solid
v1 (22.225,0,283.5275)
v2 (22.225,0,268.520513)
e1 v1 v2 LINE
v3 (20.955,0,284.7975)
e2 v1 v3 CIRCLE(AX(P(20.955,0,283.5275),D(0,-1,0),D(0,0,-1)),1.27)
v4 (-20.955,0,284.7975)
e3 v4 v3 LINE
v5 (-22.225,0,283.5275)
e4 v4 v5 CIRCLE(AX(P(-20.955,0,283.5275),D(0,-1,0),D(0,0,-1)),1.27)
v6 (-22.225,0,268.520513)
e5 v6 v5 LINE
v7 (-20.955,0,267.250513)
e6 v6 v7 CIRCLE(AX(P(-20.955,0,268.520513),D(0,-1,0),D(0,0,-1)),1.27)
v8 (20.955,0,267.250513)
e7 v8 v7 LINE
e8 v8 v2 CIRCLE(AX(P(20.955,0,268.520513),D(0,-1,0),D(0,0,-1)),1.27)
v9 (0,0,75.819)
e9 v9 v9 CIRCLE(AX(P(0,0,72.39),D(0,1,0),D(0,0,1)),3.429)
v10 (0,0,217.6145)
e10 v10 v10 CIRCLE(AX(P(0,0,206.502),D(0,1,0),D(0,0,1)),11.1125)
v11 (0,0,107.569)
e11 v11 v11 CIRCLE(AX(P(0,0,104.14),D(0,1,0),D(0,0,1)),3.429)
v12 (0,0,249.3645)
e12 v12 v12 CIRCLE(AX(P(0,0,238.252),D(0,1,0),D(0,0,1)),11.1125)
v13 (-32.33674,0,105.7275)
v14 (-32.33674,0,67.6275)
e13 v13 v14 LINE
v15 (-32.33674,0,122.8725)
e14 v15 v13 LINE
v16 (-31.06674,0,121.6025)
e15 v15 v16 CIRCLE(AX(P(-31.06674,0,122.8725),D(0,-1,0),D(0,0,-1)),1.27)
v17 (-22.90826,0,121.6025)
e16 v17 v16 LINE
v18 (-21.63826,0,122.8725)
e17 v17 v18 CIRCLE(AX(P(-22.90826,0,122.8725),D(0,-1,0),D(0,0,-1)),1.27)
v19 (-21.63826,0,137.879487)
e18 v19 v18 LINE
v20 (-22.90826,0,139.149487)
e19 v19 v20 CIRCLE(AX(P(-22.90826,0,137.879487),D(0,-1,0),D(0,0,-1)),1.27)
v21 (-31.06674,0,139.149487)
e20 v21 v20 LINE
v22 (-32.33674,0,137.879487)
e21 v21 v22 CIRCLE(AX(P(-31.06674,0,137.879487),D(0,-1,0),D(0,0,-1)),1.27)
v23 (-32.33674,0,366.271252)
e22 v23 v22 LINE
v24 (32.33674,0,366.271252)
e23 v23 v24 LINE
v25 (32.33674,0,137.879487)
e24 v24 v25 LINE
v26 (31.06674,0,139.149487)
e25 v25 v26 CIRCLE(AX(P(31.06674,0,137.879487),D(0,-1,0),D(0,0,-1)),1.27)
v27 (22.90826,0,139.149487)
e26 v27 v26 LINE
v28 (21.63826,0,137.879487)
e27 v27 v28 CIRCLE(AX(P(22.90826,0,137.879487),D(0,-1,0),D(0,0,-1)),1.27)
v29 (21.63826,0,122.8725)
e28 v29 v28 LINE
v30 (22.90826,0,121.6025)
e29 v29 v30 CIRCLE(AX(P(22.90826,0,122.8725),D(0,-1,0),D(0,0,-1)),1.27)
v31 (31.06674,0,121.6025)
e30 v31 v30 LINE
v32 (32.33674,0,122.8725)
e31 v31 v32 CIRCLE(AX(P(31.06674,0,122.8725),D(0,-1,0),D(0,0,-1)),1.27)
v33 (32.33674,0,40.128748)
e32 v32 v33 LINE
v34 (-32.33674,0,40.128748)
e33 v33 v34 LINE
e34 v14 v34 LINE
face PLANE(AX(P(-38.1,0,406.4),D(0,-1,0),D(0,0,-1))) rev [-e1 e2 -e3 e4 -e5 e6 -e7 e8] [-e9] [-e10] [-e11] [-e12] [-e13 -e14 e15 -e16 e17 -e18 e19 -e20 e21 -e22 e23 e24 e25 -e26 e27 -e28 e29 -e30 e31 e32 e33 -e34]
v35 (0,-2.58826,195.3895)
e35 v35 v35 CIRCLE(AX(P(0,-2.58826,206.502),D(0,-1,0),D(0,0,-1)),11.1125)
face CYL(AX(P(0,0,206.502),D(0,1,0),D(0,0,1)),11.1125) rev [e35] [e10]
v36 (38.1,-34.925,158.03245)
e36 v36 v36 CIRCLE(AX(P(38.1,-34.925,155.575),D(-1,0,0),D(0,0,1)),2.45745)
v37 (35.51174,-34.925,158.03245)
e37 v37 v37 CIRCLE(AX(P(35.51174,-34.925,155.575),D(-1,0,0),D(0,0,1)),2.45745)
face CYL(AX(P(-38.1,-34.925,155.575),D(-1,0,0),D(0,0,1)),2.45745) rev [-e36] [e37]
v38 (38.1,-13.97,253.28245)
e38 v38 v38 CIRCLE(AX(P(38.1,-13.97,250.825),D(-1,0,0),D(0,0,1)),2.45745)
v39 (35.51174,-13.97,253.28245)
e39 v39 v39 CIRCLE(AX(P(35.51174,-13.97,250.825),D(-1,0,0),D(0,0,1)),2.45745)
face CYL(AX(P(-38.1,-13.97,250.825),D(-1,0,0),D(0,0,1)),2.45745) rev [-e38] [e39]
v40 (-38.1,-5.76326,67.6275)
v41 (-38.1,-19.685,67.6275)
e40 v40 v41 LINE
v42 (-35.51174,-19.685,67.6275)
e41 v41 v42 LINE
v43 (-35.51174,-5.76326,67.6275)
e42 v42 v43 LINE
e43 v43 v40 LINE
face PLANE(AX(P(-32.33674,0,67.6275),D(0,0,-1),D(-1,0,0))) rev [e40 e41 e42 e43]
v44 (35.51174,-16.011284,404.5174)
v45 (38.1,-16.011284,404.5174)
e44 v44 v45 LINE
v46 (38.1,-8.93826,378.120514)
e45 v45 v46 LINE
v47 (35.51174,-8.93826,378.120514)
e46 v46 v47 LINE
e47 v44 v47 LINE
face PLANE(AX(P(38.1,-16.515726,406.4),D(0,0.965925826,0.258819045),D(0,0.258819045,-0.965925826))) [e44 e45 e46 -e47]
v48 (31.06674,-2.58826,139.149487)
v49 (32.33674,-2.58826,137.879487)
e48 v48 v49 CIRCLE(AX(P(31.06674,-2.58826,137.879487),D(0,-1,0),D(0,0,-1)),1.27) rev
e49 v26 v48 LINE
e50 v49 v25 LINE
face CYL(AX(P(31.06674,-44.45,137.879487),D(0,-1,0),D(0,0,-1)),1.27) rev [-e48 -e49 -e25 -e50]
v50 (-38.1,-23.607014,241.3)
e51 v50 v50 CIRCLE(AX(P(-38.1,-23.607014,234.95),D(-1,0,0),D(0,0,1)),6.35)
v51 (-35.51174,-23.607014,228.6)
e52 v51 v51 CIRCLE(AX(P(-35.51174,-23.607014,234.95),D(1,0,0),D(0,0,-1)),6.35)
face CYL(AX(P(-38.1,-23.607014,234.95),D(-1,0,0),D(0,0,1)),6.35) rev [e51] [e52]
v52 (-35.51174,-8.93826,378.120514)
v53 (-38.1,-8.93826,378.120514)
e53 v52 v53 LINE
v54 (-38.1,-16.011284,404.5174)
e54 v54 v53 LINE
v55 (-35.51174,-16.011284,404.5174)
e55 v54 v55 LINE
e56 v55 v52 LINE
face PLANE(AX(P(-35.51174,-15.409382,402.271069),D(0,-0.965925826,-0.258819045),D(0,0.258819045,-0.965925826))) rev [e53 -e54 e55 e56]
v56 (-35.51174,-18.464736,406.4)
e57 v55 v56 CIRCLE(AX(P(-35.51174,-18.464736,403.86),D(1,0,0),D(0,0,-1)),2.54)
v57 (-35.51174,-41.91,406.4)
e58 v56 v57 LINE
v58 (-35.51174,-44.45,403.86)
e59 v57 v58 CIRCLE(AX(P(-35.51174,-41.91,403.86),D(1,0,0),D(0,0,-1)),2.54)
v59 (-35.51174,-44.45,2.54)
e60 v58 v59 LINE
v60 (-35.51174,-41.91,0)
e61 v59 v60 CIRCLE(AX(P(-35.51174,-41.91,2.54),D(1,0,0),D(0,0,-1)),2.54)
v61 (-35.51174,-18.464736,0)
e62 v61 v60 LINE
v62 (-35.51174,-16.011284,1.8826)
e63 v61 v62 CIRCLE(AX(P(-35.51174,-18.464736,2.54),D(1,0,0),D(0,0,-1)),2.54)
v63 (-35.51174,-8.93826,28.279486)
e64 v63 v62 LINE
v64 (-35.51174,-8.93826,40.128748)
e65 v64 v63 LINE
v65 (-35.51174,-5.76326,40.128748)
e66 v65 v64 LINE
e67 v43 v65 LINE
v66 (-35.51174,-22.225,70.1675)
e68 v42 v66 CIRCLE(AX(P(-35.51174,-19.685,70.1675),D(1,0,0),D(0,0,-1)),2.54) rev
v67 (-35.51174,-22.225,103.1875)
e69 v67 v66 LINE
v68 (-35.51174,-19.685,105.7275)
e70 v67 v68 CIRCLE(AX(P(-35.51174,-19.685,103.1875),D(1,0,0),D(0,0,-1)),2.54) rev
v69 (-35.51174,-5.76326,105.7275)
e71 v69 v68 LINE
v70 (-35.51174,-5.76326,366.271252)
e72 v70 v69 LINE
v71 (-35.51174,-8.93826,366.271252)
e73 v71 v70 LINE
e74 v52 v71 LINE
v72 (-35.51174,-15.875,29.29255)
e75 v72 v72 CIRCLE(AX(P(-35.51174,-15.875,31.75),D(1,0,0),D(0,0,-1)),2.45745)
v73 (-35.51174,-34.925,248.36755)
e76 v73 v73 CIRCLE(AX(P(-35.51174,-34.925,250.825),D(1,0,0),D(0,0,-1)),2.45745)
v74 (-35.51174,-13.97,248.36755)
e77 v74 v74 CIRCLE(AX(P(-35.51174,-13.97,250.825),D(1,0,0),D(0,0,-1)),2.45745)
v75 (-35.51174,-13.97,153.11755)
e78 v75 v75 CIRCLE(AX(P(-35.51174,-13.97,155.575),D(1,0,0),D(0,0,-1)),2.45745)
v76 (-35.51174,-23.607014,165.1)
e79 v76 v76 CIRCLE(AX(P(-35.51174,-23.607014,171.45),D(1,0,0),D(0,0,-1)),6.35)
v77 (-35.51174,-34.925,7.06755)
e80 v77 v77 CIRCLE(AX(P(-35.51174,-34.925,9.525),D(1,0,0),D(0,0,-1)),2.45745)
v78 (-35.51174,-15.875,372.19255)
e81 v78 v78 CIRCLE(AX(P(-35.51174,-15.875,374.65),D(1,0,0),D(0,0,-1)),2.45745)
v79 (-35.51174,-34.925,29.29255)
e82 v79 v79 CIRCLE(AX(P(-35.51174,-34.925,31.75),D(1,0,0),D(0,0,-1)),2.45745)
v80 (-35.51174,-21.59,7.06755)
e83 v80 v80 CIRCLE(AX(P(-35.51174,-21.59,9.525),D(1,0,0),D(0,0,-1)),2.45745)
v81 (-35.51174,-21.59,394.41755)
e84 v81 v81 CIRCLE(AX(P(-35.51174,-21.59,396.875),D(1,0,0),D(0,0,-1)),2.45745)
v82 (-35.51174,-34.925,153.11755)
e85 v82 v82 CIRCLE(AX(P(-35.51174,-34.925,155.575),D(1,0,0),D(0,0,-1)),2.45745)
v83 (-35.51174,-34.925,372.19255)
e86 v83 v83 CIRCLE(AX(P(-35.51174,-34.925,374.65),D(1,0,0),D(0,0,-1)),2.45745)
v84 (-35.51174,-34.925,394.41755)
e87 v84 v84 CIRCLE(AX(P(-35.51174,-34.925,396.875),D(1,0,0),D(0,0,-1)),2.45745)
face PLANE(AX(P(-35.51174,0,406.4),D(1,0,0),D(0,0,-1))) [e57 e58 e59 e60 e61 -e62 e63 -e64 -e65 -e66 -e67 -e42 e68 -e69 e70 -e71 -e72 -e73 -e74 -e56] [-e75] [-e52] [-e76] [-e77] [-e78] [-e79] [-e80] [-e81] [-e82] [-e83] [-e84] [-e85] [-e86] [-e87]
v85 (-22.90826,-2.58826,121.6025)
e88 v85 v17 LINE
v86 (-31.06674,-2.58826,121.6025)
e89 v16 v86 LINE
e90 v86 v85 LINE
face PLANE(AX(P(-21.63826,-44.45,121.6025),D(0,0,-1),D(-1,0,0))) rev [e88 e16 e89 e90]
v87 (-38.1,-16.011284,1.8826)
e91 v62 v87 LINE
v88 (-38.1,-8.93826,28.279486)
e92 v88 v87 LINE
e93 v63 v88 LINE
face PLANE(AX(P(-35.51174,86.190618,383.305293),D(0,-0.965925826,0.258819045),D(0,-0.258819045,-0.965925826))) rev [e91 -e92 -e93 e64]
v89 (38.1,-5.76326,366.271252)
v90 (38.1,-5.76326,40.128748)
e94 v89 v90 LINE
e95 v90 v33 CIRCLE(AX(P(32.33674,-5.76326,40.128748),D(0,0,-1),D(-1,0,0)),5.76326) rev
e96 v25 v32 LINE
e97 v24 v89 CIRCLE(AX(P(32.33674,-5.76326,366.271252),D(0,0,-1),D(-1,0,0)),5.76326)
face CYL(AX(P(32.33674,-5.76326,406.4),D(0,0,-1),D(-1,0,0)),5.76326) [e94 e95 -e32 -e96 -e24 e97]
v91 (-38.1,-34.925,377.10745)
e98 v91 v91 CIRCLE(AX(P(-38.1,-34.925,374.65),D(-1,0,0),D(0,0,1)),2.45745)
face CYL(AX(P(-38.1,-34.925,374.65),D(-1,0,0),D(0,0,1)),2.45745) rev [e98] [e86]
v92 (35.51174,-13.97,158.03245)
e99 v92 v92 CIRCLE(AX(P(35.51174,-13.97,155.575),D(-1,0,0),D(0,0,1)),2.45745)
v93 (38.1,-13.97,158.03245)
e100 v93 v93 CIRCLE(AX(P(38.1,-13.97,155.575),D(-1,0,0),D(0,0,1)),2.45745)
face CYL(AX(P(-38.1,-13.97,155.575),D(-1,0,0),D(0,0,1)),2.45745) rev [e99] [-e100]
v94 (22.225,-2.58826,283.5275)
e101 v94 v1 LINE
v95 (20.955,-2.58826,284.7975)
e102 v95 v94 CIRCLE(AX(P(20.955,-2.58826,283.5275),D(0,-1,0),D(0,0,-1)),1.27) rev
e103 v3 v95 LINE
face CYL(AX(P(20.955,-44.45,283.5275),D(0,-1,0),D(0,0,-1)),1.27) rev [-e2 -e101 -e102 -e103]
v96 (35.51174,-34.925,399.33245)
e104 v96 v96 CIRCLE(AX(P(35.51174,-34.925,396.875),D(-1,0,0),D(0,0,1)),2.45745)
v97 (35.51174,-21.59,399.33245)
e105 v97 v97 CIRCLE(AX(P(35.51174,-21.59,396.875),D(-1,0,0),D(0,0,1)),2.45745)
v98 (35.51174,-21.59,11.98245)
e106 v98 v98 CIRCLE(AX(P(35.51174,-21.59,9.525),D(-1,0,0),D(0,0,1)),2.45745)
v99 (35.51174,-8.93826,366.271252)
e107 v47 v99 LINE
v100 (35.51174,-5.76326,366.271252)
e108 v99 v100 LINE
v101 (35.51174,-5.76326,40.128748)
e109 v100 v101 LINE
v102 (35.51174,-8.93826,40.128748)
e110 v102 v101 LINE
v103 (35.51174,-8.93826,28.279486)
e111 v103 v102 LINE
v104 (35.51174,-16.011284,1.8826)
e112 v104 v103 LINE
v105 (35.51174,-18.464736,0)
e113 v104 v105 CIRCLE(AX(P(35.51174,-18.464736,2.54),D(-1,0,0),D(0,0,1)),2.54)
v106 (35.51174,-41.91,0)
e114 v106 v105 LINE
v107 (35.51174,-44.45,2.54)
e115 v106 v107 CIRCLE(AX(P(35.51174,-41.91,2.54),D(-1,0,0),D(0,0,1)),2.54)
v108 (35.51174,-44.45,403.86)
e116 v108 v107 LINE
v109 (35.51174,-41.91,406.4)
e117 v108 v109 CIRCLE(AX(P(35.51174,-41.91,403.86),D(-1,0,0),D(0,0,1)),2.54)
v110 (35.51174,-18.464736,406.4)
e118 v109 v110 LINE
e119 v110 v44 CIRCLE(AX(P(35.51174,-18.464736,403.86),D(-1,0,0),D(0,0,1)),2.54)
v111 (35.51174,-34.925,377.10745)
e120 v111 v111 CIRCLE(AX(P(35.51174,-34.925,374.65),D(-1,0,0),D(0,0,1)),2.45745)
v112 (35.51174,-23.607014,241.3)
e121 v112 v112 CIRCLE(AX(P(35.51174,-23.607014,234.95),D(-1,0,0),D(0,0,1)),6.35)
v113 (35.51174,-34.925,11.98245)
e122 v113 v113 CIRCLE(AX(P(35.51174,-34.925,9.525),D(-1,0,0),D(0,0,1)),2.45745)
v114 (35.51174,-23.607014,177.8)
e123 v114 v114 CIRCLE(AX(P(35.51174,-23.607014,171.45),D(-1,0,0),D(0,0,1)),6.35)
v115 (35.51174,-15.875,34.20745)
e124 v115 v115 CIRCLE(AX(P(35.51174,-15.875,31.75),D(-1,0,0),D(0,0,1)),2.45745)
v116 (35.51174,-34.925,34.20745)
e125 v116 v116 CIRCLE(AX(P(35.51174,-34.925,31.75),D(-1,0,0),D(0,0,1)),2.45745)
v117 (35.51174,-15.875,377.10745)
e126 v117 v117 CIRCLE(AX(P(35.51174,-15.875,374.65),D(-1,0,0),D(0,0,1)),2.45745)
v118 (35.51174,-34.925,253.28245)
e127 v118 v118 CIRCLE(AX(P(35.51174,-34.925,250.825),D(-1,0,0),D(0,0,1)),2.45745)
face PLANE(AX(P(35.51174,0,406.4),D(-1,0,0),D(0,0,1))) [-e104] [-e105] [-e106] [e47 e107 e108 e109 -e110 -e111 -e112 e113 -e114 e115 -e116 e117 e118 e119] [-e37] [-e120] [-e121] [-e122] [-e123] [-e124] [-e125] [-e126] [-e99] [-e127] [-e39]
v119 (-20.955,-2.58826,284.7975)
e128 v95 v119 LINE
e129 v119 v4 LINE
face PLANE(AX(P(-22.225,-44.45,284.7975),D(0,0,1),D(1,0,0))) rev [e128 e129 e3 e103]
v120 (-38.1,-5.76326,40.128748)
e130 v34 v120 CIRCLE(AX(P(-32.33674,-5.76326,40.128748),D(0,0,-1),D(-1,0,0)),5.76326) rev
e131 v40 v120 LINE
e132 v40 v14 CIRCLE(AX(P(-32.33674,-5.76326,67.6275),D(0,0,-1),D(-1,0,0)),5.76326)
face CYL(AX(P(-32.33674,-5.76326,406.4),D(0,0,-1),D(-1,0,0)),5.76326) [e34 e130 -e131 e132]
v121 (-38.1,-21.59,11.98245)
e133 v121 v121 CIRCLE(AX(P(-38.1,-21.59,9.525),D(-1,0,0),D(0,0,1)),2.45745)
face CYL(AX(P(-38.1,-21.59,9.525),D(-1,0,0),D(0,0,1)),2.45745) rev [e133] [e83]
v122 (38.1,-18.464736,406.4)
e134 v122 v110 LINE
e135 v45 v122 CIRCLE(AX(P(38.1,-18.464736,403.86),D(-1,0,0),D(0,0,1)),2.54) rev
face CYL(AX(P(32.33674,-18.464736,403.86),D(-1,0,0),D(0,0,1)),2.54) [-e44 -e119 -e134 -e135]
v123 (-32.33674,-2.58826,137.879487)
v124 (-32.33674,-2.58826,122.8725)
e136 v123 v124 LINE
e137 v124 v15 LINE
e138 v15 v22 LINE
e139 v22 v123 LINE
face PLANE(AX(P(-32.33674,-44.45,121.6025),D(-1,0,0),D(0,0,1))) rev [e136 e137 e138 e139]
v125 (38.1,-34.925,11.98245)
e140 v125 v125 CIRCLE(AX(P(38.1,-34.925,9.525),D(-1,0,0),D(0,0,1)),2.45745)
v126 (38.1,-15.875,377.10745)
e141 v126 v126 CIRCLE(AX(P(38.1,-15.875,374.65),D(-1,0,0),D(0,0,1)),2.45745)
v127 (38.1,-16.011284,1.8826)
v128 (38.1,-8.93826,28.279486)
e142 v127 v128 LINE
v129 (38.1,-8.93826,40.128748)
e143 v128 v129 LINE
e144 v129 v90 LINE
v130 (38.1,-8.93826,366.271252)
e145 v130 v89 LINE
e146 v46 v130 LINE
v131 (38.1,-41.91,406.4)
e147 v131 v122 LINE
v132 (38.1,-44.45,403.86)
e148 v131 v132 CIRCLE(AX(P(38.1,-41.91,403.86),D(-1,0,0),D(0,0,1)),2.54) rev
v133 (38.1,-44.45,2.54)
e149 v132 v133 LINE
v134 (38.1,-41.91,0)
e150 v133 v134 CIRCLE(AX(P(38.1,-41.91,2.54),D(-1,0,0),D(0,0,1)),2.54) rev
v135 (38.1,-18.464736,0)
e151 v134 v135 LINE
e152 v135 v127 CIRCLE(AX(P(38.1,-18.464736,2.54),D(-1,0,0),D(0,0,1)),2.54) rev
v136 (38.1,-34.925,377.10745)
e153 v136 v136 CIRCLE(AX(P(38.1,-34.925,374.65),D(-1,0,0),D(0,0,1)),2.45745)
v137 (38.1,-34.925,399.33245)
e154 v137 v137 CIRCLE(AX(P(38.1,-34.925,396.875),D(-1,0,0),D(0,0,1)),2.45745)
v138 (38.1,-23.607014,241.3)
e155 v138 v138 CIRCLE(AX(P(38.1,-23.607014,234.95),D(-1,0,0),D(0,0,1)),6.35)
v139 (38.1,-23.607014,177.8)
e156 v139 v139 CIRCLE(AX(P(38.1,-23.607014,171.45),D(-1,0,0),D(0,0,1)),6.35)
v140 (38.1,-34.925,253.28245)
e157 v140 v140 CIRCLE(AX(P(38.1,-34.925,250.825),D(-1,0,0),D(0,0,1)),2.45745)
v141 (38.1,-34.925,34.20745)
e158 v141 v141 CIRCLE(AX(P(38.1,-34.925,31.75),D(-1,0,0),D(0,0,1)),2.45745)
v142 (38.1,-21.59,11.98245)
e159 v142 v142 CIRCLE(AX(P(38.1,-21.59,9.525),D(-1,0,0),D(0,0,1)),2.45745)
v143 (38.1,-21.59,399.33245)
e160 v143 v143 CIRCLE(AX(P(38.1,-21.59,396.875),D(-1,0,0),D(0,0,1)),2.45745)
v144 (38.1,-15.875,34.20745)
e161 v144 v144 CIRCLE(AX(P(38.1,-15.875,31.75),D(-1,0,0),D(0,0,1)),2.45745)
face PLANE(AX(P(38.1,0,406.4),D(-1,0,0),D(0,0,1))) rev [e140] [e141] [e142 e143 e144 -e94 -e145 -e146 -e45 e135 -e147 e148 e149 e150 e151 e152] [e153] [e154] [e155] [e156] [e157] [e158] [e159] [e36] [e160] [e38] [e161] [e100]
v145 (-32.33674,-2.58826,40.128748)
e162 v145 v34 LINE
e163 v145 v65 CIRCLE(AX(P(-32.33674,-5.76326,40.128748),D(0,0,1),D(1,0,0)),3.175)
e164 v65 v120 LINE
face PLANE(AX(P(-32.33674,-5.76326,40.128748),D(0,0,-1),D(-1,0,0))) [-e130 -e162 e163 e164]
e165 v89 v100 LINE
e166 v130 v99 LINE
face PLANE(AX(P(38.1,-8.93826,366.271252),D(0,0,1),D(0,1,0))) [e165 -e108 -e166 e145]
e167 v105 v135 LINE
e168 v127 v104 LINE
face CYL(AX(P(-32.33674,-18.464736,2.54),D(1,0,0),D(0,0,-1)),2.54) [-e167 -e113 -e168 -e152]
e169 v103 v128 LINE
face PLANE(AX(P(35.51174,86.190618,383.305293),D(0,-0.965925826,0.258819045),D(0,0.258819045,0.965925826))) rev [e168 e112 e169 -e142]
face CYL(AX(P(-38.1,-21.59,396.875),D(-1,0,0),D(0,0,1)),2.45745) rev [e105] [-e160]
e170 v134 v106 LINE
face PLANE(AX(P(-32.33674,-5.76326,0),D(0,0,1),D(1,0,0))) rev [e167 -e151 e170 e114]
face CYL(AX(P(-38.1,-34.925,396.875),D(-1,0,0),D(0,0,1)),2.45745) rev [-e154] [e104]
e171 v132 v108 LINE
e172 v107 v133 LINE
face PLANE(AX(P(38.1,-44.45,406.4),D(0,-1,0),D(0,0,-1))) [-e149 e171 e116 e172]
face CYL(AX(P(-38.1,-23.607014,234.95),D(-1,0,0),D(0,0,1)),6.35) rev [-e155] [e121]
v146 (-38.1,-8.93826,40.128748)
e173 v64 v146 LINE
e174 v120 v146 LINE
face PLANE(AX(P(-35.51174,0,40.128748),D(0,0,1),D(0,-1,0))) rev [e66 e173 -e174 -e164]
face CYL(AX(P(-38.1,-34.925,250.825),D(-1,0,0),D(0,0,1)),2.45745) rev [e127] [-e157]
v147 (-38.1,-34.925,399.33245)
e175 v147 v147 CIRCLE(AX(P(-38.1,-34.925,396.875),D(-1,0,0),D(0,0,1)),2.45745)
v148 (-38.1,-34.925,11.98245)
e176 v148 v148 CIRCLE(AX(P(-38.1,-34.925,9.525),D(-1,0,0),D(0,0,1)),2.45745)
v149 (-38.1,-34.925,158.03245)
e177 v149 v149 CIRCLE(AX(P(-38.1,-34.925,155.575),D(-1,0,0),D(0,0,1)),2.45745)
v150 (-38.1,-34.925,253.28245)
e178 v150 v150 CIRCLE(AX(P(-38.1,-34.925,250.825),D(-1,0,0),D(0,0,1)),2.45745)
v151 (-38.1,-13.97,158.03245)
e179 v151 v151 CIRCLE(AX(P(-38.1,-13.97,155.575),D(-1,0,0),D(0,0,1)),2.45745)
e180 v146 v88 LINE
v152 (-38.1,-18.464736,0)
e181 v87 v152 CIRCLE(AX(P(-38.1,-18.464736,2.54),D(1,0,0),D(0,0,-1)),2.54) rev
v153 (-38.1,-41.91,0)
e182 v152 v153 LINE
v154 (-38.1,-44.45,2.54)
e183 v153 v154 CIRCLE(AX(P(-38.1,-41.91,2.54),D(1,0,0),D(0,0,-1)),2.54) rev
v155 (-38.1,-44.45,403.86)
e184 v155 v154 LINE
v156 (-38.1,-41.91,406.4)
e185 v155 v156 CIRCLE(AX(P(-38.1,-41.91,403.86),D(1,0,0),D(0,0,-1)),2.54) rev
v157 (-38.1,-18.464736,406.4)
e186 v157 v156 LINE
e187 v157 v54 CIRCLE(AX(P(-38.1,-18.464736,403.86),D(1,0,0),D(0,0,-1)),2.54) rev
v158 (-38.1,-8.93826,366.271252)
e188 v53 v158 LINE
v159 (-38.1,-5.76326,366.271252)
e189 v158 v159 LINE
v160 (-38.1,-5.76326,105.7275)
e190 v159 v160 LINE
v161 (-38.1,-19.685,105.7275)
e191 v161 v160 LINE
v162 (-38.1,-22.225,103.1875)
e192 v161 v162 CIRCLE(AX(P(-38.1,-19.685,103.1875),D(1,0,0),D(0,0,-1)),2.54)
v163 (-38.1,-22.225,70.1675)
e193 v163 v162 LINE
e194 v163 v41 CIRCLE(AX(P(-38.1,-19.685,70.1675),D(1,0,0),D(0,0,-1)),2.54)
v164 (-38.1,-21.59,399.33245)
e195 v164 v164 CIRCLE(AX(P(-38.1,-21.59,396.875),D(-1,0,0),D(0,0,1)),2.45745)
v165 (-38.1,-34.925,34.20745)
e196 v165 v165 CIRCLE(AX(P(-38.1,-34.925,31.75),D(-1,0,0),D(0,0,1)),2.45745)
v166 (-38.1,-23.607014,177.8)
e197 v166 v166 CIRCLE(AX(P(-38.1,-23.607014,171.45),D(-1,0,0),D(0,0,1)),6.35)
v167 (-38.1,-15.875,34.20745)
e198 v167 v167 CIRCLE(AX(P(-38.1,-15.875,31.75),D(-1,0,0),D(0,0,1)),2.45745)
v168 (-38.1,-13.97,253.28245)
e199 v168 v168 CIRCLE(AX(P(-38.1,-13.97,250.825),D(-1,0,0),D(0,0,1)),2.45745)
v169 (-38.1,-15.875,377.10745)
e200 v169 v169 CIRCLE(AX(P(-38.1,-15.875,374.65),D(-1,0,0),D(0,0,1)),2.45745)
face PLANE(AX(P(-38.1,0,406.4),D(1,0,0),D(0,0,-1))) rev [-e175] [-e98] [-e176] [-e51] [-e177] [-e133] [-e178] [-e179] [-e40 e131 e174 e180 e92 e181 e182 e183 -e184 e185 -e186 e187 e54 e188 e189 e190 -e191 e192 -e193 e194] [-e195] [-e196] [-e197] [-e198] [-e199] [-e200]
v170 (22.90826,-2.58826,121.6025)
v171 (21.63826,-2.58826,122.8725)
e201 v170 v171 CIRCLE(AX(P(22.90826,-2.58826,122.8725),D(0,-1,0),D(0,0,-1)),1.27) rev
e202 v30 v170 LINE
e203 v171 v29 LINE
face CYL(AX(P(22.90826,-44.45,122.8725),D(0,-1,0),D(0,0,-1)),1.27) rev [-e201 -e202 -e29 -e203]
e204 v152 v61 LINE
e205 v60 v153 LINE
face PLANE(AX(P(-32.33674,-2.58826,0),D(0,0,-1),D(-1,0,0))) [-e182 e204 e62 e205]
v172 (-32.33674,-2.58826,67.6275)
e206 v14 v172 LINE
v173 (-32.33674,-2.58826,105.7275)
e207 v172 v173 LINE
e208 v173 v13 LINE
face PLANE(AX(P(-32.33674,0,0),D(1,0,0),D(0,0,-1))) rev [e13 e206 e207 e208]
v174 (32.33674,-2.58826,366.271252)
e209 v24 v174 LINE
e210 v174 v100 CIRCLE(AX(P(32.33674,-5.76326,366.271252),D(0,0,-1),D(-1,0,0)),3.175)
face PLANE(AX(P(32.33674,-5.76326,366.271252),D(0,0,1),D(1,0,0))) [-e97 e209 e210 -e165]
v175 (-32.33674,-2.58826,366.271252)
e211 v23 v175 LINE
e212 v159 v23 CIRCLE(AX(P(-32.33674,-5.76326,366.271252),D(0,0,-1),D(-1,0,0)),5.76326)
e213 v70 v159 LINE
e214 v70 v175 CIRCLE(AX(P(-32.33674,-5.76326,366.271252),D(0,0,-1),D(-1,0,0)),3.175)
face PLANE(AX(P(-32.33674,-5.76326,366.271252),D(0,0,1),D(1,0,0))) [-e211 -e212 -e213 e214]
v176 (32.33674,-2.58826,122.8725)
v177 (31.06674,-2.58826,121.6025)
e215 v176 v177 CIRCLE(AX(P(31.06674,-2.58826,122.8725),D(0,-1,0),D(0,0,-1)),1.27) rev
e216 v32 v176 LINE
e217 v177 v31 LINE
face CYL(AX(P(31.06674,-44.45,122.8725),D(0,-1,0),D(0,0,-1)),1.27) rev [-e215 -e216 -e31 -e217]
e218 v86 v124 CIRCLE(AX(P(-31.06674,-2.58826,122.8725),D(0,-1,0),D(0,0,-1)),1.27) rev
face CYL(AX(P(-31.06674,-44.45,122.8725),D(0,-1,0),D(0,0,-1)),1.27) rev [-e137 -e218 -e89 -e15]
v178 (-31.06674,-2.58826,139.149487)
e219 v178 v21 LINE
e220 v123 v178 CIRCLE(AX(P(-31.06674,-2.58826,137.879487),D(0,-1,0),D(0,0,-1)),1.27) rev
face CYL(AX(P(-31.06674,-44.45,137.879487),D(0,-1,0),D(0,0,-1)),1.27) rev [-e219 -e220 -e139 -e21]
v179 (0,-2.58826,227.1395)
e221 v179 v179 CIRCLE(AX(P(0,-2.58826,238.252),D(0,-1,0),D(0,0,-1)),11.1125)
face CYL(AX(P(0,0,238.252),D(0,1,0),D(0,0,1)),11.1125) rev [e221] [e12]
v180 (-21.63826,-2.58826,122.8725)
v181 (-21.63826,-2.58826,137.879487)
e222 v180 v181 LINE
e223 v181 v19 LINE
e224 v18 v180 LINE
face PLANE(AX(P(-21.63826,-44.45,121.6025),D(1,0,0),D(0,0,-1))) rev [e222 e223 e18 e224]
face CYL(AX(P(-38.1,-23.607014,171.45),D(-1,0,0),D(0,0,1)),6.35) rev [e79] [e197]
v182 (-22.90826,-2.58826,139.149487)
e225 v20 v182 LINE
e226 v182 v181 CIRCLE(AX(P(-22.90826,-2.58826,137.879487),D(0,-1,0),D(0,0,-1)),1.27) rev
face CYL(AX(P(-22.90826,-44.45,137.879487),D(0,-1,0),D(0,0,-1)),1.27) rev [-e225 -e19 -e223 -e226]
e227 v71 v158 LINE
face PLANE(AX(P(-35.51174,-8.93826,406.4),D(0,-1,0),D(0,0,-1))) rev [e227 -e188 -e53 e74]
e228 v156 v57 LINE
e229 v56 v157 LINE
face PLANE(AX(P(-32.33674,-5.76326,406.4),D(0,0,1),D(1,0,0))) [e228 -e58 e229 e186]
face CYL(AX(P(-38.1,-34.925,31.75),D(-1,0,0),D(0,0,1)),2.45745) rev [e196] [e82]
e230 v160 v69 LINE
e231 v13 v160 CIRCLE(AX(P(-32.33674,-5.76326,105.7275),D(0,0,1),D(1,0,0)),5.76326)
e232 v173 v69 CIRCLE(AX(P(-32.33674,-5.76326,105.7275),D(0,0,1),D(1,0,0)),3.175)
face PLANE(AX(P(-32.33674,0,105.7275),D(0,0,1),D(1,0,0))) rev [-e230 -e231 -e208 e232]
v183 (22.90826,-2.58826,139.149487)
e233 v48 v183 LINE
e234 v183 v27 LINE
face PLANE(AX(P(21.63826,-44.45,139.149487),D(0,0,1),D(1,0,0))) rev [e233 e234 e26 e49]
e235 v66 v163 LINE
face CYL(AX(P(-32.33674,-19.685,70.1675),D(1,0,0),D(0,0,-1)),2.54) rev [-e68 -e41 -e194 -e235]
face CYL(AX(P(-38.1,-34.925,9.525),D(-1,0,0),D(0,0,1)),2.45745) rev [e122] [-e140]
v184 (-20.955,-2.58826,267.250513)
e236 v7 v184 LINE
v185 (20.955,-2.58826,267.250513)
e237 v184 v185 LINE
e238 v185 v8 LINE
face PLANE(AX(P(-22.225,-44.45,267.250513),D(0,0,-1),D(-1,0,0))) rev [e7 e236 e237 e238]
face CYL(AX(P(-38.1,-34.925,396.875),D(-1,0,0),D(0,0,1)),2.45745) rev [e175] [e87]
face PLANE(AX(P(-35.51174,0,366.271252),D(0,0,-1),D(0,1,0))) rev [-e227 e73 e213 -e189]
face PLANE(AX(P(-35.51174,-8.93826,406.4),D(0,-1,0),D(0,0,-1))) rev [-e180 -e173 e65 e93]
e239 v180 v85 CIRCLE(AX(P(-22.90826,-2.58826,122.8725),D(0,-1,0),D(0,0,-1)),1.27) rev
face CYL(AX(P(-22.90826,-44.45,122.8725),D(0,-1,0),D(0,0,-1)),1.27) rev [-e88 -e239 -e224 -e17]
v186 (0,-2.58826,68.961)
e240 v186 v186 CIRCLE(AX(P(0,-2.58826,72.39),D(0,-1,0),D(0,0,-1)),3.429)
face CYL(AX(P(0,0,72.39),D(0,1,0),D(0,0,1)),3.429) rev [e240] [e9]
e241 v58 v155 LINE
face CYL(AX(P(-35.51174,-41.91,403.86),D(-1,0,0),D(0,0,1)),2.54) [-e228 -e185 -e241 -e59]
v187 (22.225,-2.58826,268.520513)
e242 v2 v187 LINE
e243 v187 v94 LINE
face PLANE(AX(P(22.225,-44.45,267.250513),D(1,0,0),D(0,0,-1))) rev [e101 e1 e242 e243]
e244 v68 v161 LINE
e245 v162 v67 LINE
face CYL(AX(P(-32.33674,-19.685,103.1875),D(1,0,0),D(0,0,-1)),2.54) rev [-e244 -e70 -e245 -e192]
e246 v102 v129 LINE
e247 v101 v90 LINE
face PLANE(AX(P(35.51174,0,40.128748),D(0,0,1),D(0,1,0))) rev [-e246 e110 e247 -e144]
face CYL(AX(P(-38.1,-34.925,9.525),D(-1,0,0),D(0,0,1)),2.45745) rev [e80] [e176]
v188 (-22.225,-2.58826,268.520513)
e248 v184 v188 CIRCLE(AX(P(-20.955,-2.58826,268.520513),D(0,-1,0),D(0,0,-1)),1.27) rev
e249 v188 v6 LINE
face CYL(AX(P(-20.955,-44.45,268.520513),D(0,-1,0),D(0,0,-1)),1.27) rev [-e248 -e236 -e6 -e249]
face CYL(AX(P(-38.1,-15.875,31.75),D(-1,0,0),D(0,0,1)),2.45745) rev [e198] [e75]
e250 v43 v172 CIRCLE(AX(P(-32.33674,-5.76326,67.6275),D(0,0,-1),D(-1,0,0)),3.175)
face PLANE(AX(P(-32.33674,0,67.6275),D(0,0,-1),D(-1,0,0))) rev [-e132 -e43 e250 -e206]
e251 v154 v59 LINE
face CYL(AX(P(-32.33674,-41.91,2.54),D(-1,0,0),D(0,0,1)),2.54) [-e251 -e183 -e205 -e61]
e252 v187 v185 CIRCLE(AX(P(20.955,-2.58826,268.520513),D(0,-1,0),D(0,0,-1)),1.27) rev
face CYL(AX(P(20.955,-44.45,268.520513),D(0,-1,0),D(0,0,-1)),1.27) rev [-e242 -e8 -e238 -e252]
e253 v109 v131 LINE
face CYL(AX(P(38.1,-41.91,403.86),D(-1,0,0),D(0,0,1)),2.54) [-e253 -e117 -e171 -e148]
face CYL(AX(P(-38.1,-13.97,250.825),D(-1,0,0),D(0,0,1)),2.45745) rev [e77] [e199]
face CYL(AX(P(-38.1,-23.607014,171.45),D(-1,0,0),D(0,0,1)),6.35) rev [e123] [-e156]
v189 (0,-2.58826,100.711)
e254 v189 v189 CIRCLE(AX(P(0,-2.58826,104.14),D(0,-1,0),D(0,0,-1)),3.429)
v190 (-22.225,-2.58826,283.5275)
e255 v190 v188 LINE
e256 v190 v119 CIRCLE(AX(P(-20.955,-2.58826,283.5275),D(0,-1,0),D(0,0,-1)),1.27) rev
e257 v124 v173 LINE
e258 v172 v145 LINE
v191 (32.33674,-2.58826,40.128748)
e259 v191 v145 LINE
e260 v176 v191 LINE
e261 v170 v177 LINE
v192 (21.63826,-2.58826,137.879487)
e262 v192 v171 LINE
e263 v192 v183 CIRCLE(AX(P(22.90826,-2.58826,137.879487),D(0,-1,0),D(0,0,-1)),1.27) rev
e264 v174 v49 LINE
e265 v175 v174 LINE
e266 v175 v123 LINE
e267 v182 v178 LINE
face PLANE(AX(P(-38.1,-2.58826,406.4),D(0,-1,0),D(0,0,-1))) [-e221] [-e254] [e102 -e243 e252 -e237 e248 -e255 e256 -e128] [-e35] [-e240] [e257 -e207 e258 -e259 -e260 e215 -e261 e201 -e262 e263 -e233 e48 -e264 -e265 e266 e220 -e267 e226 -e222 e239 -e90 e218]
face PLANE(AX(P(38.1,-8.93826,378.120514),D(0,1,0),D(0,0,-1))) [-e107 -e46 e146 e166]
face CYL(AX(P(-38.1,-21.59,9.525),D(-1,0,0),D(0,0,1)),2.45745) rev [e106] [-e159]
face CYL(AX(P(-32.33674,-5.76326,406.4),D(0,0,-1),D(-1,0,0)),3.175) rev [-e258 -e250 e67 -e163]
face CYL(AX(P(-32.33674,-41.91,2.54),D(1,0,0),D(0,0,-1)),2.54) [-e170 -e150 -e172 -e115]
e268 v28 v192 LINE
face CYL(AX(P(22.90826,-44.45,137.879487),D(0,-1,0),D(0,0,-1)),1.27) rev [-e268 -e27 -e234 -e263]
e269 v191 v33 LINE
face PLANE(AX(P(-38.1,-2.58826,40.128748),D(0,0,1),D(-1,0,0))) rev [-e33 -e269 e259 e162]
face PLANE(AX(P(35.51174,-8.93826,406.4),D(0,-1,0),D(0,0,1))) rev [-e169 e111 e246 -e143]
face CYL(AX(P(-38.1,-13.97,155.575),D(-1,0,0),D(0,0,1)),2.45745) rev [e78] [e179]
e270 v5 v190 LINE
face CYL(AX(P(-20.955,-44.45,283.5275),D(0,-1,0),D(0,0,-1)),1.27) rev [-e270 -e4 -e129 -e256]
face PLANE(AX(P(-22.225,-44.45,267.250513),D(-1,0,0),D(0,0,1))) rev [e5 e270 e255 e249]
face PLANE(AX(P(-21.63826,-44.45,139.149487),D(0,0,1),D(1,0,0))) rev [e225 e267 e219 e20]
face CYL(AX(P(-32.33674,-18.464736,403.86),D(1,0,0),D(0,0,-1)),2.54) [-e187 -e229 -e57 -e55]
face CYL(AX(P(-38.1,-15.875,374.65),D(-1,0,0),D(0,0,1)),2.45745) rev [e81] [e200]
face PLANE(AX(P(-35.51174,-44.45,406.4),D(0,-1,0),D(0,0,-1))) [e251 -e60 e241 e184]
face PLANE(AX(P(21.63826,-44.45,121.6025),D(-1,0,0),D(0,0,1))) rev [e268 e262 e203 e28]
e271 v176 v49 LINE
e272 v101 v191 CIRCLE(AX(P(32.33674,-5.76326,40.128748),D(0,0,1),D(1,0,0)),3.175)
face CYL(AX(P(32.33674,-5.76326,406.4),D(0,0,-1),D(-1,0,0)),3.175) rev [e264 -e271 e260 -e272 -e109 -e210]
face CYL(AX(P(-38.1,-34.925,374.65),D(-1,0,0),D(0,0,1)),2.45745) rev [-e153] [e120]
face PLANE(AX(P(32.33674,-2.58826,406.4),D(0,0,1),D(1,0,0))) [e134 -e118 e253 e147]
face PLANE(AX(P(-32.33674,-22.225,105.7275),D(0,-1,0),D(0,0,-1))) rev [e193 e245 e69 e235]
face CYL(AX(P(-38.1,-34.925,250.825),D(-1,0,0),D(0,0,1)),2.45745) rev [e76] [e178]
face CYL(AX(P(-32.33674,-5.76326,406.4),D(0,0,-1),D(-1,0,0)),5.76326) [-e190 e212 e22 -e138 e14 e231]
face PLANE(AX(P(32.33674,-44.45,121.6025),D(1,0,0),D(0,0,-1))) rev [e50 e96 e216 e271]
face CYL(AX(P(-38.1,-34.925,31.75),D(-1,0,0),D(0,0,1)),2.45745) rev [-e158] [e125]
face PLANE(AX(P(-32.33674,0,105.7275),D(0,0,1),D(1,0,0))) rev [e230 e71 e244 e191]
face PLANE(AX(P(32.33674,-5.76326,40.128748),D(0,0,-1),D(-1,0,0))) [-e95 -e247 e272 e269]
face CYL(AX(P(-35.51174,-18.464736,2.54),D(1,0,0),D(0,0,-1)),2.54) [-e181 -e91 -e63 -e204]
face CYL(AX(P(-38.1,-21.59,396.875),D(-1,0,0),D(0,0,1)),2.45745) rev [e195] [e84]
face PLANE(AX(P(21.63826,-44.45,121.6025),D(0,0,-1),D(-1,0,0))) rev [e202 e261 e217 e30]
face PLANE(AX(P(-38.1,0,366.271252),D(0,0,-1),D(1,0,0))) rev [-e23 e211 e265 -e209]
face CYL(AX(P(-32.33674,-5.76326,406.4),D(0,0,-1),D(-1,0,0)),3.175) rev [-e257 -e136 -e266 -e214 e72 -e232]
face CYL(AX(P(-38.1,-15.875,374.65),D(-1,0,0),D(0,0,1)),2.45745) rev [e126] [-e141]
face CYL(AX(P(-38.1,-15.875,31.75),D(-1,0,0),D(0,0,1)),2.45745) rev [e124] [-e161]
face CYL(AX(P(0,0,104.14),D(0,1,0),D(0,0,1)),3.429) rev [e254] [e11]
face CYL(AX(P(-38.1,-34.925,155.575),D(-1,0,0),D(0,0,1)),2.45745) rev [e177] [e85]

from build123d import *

# Parameters (mm, degrees)
BASE_FLANGE1_DEPTH           = 406.4
CUT_EXTRUDE1_DEPTH           = 416.864403983
F_1_4_CLEARANCE_HOLE1_D      = 6.858
F_10_0_1935_DIAMETER_HOLE1_D = 4.9149
SKETCH15_W                   = 10.69848
SKETCH15_H                   = 17.546986719
CUT_EXTRUDE4_DEPTH           = 411.595144272
SKETCH16_W                   = 44.45
SKETCH16_H                   = 17.546986719
CUT_EXTRUDE5_DEPTH           = 411.595144272
FILLET2_R                    = 1.27
F_1_2_0_5_DIAMETER_HOLE1_D   = 12.7
SKETCH19_W                   = 38.1
SKETCH19_H                   = 22.225
CUT_EXTRUDE6_DEPTH           = 5.76326
F_7_8_0_875_DIAMETER_HOLE1_D = 22.225
FILLET3_R                    = 2.54


# Sheet-metal steps are written as plain solids
with BuildPart() as part:
    # Sketch1 → Base-Flange1 (new body)
    with BuildSketch(Plane.XY):
        with BuildLine():
            Line((38.1, -44.45), (38.1, -5.76326))
            ThreePointArc((38.1, -5.76326), (36.411980228, -1.688019772), (32.33674, 0))
            Line((32.33674, 0), (-32.33674, 0))
            ThreePointArc((-32.33674, 0), (-36.411980228, -1.688019772), (-38.1, -5.76326))
            Line((-38.1, -5.76326), (-38.1, -44.45))
            Line((-38.1, -44.45), (-35.51174, -44.45))
            Line((-35.51174, -44.45), (-35.51174, -5.76326))
            ThreePointArc((-35.51174, -5.76326), (-34.58180403, -3.51819597), (-32.33674, -2.58826))
            Line((-32.33674, -2.58826), (32.33674, -2.58826))
            ThreePointArc((32.33674, -2.58826), (34.58180403, -3.51819597), (35.51174, -5.76326))
            Line((35.51174, -5.76326), (35.51174, -44.45))
            Line((35.51174, -44.45), (38.1, -44.45))
        make_face()
    extrude(amount=BASE_FLANGE1_DEPTH)

    # Sketch7 → Cut-Extrude1 (cut, through all)
    with BuildSketch(Plane(origin=(38.1, 0, 0), x_dir=(0, 0, -1), z_dir=(1, 0, 0))):
        Polygon((-406.4, -16.515725506), (-378.120513741, -8.93826), (-366.271252427, -8.93826), (-366.271252427, 0), (-406.4, 0), align=None)
        Polygon((0, 0), (0, -16.515725506), (-28.279486259, -8.93826), (-40.128747573, -8.93826), (-40.128747573, 0), align=None)
    extrude(amount=-CUT_EXTRUDE1_DEPTH, mode=Mode.SUBTRACT)

    # 1/4 Clearance Hole1 (through all)
    with Locations(Plane(origin=(0, 0, 0), x_dir=(1, 0, 0), z_dir=(0, 1, 0))):
        with Locations((0, -104.14), (0, -72.39)):
            Hole(F_1_4_CLEARANCE_HOLE1_D / 2)

    # #10 (0.1935) Diameter Hole1 (through all)
    with Locations(Plane.ZY.offset(38.1)):
        with Locations((9.525, -34.925), (9.525, -21.59), (31.75, -34.925), (31.75, -15.875), (374.65, -15.875), (374.65, -34.925), (396.875, -21.59), (396.875, -34.925), (155.575, -13.97), (155.575, -34.925), (250.825, -34.925), (250.825, -13.97)):
            Hole(F_10_0_1935_DIAMETER_HOLE1_D / 2)

    # Sketch15 → Cut-Extrude4 (cut, through all)
    with BuildSketch(Plane(origin=(0, 0, 0), x_dir=(1, 0, 0), z_dir=(0, 1, 0))):
        with Locations((26.9875, -130.37599336)):
            Rectangle(SKETCH15_W, SKETCH15_H)
        with Locations((-26.9875, -130.37599336)):
            Rectangle(SKETCH15_W, SKETCH15_H)
    extrude(amount=-CUT_EXTRUDE4_DEPTH, mode=Mode.SUBTRACT)

    # Sketch16 → Cut-Extrude5 (cut, through all)
    with BuildSketch(Plane(origin=(0, 0, 0), x_dir=(1, 0, 0), z_dir=(0, 1, 0))):
        with Locations((0, -276.024006641)):
            Rectangle(SKETCH16_W, SKETCH16_H)
    extrude(amount=-CUT_EXTRUDE5_DEPTH, mode=Mode.SUBTRACT)

    # Fillet2
    fillet2_edges = [part.edges().sort_by_distance(p)[0] for p in [
        (21.63826, -1.29413, 139.149486719),
        (21.63826, -1.29413, 121.6025),
        (32.33674, -1.29413, 121.6025),
        (32.33674, -1.29413, 139.149486719),
        (-32.33674, -1.29413, 121.6025),
        (-21.63826, -1.29413, 121.6025),
        (-21.63826, -1.29413, 139.149486719),
        (-32.33674, -1.29413, 139.149486719),
        (-22.225, -1.29413, 284.7975),
        (-22.225, -1.29413, 267.250513281),
        (22.225, -1.29413, 267.250513281),
        (22.225, -1.29413, 284.7975),
    ]]
    fillet(fillet2_edges, radius=FILLET2_R)

    # 1/2 (0.5) Diameter Hole1 (through all)
    with Locations(Plane.ZY.offset(38.1)):
        with Locations((171.45, -23.607014), (234.95, -23.607014)):
            Hole(F_1_2_0_5_DIAMETER_HOLE1_D / 2)

    # Sketch19 → Cut-Extrude6 (cut)
    with BuildSketch(Plane.ZY.offset(38.1)):
        with Locations((86.6775, -11.1125)):
            Rectangle(SKETCH19_W, SKETCH19_H)
    extrude(amount=-CUT_EXTRUDE6_DEPTH, mode=Mode.SUBTRACT)

    # 7/8 (0.875) Diameter Hole1 (through all)
    with Locations(Plane(origin=(0, 0, 0), x_dir=(1, 0, 0), z_dir=(0, 1, 0))):
        with Locations((0, -238.252), (0, -206.502)):
            Hole(F_7_8_0_875_DIAMETER_HOLE1_D / 2)

    # Fillet3
    fillet3_edges = [part.edges().sort_by_distance(p)[0] for p in [
        (36.80587, -16.515725506, 0),
        (-36.80587, -16.515725506, 0),
        (36.80587, -44.45, 0),
        (-36.80587, -44.45, 0),
        (36.80587, -44.45, 406.4),
        (-36.80587, -22.225, 67.6275),
        (-36.80587, -22.225, 105.7275),
        (-36.80587, -16.515725506, 406.4),
        (36.80587, -16.515725506, 406.4),
        (-36.80587, -44.45, 406.4),
    ]]
    fillet(fillet3_edges, radius=FILLET3_R)


solid = part.part
